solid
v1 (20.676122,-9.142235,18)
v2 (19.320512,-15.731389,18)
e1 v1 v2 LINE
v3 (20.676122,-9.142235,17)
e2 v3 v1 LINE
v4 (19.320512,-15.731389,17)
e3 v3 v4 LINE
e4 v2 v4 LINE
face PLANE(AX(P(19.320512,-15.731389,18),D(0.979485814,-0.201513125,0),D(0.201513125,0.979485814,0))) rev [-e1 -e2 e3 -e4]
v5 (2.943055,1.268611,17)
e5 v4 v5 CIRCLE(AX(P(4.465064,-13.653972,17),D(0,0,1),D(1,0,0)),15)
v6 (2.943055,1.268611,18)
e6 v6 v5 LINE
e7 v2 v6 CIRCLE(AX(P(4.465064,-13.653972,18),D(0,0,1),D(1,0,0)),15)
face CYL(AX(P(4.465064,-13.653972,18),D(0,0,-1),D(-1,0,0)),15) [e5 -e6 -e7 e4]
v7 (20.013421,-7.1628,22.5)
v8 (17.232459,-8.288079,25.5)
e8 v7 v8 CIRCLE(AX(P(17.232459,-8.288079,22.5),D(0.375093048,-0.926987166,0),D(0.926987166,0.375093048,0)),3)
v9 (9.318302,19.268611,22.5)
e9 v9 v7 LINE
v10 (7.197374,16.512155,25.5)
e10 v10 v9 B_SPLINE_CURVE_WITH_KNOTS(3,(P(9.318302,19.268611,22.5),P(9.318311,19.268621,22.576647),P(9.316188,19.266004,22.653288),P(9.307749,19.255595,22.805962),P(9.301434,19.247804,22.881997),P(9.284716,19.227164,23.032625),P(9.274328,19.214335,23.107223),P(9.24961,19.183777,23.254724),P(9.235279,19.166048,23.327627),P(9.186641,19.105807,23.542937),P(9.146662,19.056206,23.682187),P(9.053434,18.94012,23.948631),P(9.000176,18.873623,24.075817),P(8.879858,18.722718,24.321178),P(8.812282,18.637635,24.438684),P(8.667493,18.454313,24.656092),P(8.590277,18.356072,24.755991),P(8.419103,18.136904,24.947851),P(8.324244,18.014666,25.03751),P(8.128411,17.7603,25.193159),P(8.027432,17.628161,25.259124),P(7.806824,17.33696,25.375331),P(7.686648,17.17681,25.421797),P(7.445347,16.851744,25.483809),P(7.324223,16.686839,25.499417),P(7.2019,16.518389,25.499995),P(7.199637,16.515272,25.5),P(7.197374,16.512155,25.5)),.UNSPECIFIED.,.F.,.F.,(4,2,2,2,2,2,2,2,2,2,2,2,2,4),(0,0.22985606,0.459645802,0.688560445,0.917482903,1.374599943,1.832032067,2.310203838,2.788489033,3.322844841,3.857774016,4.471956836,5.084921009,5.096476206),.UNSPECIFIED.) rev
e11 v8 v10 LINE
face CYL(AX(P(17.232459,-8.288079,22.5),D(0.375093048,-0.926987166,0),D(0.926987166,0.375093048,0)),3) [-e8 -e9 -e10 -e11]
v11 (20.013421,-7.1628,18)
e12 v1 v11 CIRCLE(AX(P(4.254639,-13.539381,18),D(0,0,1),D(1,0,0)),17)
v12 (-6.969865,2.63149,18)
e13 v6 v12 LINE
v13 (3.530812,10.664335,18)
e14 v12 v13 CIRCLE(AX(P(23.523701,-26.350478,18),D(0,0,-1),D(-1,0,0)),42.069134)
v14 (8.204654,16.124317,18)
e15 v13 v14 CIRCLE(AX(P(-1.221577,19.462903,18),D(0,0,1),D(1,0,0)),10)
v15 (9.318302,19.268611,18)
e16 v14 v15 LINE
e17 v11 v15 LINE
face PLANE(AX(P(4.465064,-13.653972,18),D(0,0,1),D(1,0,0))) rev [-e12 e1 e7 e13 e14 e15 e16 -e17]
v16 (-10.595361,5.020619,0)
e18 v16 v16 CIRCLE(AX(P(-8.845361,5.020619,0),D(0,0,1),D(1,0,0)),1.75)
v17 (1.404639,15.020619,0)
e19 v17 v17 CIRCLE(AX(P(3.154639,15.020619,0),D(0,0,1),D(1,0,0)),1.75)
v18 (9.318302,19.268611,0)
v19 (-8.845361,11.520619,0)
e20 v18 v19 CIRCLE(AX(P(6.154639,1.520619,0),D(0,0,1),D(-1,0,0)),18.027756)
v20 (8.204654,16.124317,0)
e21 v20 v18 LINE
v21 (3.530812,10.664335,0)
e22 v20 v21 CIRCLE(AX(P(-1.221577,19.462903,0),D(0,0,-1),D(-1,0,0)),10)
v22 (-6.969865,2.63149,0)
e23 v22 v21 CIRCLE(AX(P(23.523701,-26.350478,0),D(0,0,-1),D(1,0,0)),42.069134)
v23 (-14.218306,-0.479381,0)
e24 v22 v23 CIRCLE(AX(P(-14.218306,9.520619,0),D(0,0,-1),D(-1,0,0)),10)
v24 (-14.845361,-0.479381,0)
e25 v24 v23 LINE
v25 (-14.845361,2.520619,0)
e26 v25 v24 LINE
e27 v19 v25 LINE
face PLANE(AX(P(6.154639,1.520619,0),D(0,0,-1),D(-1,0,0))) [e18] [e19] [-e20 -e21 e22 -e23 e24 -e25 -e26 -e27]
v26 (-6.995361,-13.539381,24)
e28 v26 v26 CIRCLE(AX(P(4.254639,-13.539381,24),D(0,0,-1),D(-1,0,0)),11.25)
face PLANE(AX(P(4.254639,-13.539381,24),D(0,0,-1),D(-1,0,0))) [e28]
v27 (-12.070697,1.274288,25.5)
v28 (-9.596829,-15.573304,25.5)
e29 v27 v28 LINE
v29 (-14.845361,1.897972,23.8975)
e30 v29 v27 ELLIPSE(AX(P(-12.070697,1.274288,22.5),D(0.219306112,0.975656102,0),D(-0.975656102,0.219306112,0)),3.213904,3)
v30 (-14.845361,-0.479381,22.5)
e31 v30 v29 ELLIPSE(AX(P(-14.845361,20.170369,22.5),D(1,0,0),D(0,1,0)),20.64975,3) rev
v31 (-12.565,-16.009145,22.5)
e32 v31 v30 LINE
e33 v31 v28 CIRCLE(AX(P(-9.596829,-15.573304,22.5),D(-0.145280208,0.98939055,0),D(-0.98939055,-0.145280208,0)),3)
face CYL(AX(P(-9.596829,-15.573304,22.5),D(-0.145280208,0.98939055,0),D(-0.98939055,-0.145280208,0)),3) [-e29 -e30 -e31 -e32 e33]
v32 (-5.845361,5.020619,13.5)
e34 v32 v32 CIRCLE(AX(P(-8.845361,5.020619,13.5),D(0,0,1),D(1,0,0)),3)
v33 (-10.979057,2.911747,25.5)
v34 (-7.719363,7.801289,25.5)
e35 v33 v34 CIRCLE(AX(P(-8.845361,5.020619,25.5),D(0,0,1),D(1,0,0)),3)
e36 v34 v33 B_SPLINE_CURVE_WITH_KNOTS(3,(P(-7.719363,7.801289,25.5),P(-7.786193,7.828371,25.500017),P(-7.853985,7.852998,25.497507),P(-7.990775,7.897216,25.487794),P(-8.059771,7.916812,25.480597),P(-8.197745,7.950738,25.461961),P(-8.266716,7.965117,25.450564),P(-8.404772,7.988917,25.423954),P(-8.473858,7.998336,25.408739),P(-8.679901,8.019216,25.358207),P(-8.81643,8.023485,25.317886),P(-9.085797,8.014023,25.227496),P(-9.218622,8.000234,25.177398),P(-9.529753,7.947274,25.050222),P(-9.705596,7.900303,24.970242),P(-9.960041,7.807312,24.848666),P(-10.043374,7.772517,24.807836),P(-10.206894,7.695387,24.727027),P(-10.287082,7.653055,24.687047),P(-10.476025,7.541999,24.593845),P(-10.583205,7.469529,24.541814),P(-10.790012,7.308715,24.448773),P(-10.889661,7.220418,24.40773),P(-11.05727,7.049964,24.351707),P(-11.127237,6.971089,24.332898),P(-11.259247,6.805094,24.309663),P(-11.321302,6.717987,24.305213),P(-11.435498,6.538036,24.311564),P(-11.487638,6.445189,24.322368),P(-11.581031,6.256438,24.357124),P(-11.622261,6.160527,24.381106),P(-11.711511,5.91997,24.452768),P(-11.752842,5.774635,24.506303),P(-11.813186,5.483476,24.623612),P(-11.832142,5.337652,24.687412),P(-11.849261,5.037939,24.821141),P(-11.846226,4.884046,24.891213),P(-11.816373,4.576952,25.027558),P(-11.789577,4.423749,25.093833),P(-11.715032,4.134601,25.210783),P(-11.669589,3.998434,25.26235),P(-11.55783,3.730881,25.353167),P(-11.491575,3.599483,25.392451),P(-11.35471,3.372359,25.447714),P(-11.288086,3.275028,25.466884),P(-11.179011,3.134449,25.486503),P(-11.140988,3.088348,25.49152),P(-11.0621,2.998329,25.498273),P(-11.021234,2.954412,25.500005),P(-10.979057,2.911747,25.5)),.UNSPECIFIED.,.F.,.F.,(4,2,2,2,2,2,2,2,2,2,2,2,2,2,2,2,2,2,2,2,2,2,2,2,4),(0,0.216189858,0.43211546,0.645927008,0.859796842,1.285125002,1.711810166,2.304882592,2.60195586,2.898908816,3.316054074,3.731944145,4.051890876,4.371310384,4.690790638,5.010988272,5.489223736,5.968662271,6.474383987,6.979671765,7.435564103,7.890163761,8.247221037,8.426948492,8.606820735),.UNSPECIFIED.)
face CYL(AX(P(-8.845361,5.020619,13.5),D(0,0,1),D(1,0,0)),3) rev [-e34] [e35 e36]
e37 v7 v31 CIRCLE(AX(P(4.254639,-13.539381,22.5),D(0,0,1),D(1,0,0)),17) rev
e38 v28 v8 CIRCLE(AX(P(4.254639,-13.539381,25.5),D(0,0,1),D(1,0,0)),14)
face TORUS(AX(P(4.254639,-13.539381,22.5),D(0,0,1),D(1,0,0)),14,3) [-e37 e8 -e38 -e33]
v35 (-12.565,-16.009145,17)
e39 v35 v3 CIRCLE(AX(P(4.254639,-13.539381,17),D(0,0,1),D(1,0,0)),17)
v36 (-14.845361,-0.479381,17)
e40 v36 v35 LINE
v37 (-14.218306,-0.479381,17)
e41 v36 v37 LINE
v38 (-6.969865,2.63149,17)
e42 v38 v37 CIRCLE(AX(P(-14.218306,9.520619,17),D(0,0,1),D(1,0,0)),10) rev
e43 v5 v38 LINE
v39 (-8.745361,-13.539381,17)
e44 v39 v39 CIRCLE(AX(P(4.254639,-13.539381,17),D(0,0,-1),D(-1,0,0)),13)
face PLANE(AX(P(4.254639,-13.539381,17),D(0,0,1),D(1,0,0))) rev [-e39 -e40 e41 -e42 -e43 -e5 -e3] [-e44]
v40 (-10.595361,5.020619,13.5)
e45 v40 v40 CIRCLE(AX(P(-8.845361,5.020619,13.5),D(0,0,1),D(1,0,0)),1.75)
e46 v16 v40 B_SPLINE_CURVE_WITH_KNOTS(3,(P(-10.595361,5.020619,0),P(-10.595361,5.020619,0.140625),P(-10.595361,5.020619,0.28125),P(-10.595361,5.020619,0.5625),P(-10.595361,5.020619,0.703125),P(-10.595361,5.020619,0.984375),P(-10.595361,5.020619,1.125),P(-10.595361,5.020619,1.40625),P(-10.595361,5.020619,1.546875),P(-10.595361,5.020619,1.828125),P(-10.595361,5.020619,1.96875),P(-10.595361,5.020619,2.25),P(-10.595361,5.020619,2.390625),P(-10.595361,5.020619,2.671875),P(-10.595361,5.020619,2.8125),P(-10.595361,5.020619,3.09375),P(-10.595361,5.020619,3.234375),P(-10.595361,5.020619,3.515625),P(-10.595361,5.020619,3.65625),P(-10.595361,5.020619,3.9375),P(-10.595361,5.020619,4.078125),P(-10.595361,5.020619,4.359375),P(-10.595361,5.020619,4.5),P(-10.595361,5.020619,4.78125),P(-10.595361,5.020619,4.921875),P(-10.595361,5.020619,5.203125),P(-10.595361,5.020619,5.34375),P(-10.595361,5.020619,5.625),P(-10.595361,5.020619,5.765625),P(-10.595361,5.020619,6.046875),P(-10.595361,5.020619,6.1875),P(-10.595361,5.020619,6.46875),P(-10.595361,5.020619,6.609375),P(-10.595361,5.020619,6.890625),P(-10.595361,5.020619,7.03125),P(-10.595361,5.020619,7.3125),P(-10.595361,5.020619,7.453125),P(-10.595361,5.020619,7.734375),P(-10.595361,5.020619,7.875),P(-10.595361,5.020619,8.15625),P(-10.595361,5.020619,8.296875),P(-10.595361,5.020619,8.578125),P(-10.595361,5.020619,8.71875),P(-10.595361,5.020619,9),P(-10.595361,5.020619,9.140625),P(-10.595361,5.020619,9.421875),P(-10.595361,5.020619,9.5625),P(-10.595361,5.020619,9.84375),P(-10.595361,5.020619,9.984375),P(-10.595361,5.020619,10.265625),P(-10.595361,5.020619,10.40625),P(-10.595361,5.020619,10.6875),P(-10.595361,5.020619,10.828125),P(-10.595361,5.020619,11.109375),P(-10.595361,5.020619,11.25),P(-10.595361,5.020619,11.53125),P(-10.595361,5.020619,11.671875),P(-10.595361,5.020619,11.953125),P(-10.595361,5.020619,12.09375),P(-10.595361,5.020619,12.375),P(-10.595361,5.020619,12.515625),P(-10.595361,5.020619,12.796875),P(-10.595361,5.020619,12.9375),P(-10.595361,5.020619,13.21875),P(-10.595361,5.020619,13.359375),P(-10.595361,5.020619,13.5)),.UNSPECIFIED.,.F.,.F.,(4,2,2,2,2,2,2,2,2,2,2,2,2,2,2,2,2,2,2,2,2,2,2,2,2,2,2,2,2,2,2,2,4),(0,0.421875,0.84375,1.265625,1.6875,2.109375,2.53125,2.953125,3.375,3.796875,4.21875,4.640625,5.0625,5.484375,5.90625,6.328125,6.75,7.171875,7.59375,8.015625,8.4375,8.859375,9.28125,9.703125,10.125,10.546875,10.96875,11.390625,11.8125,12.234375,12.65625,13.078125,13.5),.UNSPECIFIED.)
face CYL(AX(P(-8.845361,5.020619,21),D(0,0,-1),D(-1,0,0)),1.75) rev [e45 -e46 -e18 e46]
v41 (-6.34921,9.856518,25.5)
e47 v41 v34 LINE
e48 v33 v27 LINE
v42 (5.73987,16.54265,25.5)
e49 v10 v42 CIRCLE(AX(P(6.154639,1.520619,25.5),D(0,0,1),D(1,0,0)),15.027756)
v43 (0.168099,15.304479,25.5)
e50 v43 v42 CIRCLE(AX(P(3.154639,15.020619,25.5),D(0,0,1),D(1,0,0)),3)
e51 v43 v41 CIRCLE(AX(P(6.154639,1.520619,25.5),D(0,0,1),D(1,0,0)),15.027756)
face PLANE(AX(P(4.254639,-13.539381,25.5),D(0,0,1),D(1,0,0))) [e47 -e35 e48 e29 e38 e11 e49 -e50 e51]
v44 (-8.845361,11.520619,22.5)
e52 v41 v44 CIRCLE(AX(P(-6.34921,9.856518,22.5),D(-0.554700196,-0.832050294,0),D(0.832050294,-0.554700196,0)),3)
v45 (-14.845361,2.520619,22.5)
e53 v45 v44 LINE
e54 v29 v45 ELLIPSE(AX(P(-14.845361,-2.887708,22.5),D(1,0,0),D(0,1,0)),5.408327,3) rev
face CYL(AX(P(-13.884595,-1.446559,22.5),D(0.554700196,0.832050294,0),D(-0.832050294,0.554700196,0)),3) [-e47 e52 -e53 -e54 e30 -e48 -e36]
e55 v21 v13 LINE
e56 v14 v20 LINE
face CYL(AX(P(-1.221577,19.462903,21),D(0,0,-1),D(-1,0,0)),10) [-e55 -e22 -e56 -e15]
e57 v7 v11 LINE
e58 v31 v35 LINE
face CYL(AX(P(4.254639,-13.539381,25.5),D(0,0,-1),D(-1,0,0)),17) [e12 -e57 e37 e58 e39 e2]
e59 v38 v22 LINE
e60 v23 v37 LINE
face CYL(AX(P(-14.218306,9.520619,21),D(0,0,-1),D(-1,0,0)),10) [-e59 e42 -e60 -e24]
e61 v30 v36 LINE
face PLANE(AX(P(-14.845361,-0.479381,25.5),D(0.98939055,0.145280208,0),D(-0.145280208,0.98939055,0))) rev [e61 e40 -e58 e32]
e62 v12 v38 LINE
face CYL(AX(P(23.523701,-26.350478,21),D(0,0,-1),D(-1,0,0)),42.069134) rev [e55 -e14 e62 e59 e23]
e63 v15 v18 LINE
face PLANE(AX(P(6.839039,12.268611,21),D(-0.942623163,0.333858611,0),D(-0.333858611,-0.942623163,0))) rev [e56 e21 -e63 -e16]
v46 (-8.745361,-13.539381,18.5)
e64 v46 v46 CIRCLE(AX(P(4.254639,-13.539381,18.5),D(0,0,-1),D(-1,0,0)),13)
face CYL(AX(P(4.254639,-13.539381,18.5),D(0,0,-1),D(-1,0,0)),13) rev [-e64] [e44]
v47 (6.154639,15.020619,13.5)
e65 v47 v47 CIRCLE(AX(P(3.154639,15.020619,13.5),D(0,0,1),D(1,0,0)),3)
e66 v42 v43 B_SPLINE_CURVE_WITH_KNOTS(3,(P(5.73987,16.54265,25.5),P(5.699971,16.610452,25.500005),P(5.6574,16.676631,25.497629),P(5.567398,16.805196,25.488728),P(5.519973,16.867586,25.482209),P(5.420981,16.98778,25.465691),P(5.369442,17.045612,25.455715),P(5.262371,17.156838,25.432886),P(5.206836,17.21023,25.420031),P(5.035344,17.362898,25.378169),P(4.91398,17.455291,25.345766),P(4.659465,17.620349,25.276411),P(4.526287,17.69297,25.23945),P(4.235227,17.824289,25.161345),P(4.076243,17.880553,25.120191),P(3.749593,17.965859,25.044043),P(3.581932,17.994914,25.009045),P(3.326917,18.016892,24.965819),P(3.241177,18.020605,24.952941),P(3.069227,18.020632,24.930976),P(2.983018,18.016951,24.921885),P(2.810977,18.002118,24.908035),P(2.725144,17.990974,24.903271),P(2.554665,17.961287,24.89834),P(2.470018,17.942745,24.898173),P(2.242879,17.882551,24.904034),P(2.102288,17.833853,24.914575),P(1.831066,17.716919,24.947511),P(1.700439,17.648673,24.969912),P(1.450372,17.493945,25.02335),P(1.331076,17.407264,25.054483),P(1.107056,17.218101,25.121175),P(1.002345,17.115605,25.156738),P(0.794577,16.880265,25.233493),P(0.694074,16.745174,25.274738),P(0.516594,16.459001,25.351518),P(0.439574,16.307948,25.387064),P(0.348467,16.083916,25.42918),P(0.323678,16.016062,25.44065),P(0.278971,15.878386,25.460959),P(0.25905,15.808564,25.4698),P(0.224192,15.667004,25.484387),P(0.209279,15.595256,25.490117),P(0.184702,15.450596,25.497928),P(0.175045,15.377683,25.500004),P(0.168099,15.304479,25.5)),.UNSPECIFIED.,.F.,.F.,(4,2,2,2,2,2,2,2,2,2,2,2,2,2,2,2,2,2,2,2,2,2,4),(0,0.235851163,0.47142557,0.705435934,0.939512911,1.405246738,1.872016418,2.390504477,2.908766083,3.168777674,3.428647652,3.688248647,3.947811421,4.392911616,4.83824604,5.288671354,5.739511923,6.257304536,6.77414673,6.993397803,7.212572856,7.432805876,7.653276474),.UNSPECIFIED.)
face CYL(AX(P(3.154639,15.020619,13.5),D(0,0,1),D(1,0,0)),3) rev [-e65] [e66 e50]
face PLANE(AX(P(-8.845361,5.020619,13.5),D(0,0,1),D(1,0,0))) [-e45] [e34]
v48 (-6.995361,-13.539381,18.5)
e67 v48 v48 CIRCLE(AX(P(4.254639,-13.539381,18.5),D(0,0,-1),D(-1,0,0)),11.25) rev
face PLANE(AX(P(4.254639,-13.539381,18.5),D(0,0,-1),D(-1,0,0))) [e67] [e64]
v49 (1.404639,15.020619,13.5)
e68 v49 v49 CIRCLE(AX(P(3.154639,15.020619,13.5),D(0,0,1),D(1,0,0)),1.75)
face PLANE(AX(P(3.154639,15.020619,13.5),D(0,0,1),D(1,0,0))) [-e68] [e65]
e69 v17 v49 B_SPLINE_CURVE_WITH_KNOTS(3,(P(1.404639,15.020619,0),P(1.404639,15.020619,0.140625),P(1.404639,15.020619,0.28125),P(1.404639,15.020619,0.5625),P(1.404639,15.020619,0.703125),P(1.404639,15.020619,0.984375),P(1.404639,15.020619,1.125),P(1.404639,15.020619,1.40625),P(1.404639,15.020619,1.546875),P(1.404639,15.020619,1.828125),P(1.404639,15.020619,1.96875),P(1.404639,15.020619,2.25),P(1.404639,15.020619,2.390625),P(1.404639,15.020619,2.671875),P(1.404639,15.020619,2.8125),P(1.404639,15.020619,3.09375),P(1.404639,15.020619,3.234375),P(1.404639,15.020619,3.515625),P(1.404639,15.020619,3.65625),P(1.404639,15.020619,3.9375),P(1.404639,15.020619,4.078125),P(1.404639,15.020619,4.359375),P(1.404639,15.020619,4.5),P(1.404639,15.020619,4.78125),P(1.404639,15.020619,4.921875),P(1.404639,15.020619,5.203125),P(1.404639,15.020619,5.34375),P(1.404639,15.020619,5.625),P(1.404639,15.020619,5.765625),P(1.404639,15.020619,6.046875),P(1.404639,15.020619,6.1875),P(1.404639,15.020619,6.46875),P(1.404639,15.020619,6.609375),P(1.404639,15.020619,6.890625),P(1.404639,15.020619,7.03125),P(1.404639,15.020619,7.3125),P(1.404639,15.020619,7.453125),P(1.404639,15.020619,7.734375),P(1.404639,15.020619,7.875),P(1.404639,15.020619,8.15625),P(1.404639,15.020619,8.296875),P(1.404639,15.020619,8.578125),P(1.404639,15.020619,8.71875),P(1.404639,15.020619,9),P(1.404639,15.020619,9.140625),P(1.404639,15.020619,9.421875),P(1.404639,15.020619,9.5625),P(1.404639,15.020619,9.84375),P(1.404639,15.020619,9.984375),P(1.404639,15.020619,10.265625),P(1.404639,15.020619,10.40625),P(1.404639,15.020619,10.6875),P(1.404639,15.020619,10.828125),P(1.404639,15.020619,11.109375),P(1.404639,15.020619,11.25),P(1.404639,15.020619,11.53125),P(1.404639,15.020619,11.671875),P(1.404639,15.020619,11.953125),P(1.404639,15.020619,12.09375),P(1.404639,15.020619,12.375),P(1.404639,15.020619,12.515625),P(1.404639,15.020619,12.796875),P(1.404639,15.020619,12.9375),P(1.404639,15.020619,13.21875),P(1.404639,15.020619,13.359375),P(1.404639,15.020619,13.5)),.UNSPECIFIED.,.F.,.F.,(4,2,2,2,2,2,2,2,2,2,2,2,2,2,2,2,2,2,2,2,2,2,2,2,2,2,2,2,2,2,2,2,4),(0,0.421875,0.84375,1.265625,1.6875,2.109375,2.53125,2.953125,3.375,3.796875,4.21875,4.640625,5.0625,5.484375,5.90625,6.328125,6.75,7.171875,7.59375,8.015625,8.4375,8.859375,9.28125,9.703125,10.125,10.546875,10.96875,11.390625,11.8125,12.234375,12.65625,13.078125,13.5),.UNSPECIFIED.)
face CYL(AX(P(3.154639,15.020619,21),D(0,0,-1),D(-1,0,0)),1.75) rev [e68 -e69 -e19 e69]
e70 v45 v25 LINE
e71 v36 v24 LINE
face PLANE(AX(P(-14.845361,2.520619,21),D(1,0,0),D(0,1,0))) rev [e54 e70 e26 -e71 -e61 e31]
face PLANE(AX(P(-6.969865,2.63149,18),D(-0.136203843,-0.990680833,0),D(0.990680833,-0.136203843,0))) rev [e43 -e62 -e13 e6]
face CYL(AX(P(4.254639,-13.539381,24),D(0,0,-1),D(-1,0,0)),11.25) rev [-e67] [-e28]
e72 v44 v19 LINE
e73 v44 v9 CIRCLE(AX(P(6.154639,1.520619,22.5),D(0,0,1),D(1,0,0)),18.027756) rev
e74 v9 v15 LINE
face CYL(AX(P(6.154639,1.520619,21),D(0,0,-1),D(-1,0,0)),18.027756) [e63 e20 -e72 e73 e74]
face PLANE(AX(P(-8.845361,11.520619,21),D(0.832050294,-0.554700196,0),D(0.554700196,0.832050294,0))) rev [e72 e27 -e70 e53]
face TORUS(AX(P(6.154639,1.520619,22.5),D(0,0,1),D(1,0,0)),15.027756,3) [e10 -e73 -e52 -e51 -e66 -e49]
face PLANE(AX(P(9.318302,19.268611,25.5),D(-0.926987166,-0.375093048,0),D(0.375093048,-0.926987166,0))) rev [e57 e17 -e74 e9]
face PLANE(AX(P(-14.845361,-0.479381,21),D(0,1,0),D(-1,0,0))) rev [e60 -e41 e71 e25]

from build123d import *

# Parameters (mm, degrees)
SKETCH1_R                = 1.75
BOSS_EXTRUDE1_DEPTH      = 21
FILLET3_R                = 10
BOSS_EXTRUDE2_DEPTH      = 4.5
BOSS_EXTRUDE2_DEPTH_BACK = 4
SKETCH3_R                = 1.75
SKETCH4_R                = 11.25
CUT_EXTRUDE1_DEPTH       = 7
SKETCH5_R                = 13
CUT_EXTRUDE2_DEPTH       = 1.5
SKETCH6_R                = 3
CUT_EXTRUDE3_DEPTH       = 12
CUT_EXTRUDE4_DEPTH       = 1
FILLET7_R                = 3
FILLET8_R                = 10


with BuildPart() as part:
    # Sketch1 → Boss-Extrude1 (new body)
    with BuildSketch(Plane.XY):
        with BuildLine():
            Line((-8.845360825, 11.520618557), (-14.845360825, 2.520618557))
            Line((-14.845360825, 2.520618557), (-14.845360825, -0.479381443))
            Line((-14.845360825, -0.479381443), (-9.845360825, -0.479381443))
            Line((-9.845360825, -0.479381443), (-8.845360825, 0.520618557))
            ThreePointArc((-8.845360825, 0.520618557), (-1.696742799, 7.320595709), (6.83903909, 12.26861112))
            Line((6.83903909, 12.26861112), (9.318301605, 19.26861112))
            ThreePointArc((9.318301605, 19.26861112), (-0.918731235, 18.102760488), (-8.845360825, 11.520618557))
        make_face()
        with Locations(Location((-8.845360825, 5.020618557, 0), (0, 0, 180))):
            Circle(SKETCH1_R, mode=Mode.SUBTRACT)
        with Locations(Location((3.154639175, 15.020618557, 0), (0, 0, 180))):
            Circle(SKETCH1_R, mode=Mode.SUBTRACT)
    extrude(amount=BOSS_EXTRUDE1_DEPTH)

    # Fillet3
    # the kernel refuses this fillet: 10 mm, written as the material it takes off along each edge
    with BuildSketch(Plane(origin=(-9.845360825, -0.479381443, -10.932362995), x_dir=(-1, 0, 0), z_dir=(0, 0, 1))) as fillet3_piece_1:
        with BuildLine():
            CenterArc((4.372945198, -10), FILLET3_R, 90, 46.455884642)
            Line((-2.87549632, -3.110871204), (-3.600340471, -2.421958325))
            ThreePointArc((-3.600340471, -2.421958325), (-1.769425443, -0.361263367), (-0.707106781, 0.707106781))
            Line((-0.707106781, 0.707106781), (0, 1))
            Line((0, 1), (4.372945198, 1))
            Line((4.372945198, 1), (4.372945198, 0))
        make_face()
    extrude(amount=42.86472599, mode=Mode.SUBTRACT)

    # Sketch3 → Boss-Extrude2 (add, two sides: drawn at the far end of the back side and taken through both)
    with BuildSketch(Plane.XY.offset(21).offset(-BOSS_EXTRUDE2_DEPTH_BACK)):
        with BuildLine():
            Line((-14.845360825, 2.520618557), (-14.845360825, -0.479381443))
            Line((-14.845360825, -0.479381443), (-12.565000182, -16.009144975))
            ThreePointArc((-12.565000182, -16.009144975), (8.709502938, -29.945300767), (20.013420995, -7.162799635))
            Line((20.013420995, -7.162799635), (9.318301605, 19.26861112))
            ThreePointArc((9.318301605, 19.26861112), (-0.918731235, 18.102760488), (-8.845360825, 11.520618557))
            Line((-8.845360825, 11.520618557), (-14.845360825, 2.520618557))
        make_face()
        with Locations(Location((3.154639175, 15.020618557, 0), (0, 0, 180))):
            Circle(SKETCH3_R, mode=Mode.SUBTRACT)
        with Locations(Location((-8.845360825, 5.020618557, 0), (0, 0, 180))):
            Circle(SKETCH3_R, mode=Mode.SUBTRACT)
    extrude(amount=BOSS_EXTRUDE2_DEPTH + BOSS_EXTRUDE2_DEPTH_BACK)

    # Sketch4 → Cut-Extrude1 (cut)
    with BuildSketch(Plane(origin=(0, 0, 17), x_dir=(-1, 0, 0), z_dir=(0, 0, -1))):
        with Locations((-4.254639175, -13.539381443)):
            Circle(SKETCH4_R)
    extrude(amount=-CUT_EXTRUDE1_DEPTH, mode=Mode.SUBTRACT)

    # Sketch5 → Cut-Extrude2 (cut)
    with BuildSketch(Plane(origin=(0, 0, 17), x_dir=(-1, 0, 0), z_dir=(0, 0, -1))):
        with Locations((-4.254639175, -13.539381443)):
            Circle(SKETCH5_R)
    extrude(amount=-CUT_EXTRUDE2_DEPTH, mode=Mode.SUBTRACT)

    # Sketch6 → Cut-Extrude3 (cut)
    with BuildSketch(Plane.XY.offset(25.5)):
        with Locations((-8.845360825, 5.020618557)):
            Circle(SKETCH6_R)
        with Locations((3.154639175, 15.020618557)):
            Circle(SKETCH6_R)
    extrude(amount=-CUT_EXTRUDE3_DEPTH, mode=Mode.SUBTRACT)

    # Sketch7 → Cut-Extrude4 (cut)
    with BuildSketch(Plane(origin=(0, 0, 17), x_dir=(-1, 0, 0), z_dir=(0, 0, -1))):
        with BuildLine():
            Line((-19.320512006, -15.73138888), (-26.521187379, 19.26861112))
            Line((-26.521187379, 19.26861112), (-9.318301605, 19.26861112))
            Line((-9.318301605, 19.26861112), (-6.83903909, 12.26861112))
            ThreePointArc((-6.83903909, 12.26861112), (0.552528201, 8.148031782), (6.969864505, 2.631489761))
            Line((6.969864505, 2.631489761), (-2.943055137, 1.26861112))
            ThreePointArc((-2.943055137, 1.26861112), (-15.267616881, -3.247010549), (-19.320512006, -15.73138888))
        make_face()
    extrude(amount=-CUT_EXTRUDE4_DEPTH, mode=Mode.SUBTRACT)

    # Fillet7
    # the kernel refuses this fillet: 3 mm, written as the material it takes off along each edge
    with BuildSketch(Plane(origin=(-8.845360825, 11.520618557, 25.5), x_dir=(0, 0, -1), z_dir=(-0.554700196225229, -0.8320502943378438, 0))) as fillet7_piece_1:
        with BuildLine():
            CenterArc((FILLET7_R, FILLET7_R), FILLET7_R, 180, 90)
            Line((0, FILLET7_R), (0, 0))
            Line((0, 0), (FILLET7_R, 0))
        make_face()
    extrude(amount=18.316653826, mode=Mode.SUBTRACT)
    with BuildSketch(Plane(origin=(-18.114165499, 21.781905941, 25.5), x_dir=(0, 0, -1), z_dir=(0.14528020772302286, -0.9893905504116943, 0))) as fillet7_piece_2:
        with BuildLine():
            CenterArc((FILLET7_R, FILLET7_R), FILLET7_R, 180, 90)
            Line((0, FILLET7_R), (0, 0))
            Line((0, 0), (FILLET7_R, 0))
        make_face()
    extrude(amount=38.196292556, mode=Mode.SUBTRACT)
    with BuildSketch(Plane(origin=(4.254639175, -13.539381443, 25.5), x_dir=(-0.9893905504116943, -0.14528020772302197, 0), z_dir=(-0.14528020772302197, 0.9893905504116943, 0))) as fillet7_piece_3:
        with BuildLine():
            CenterArc((17 - FILLET7_R, -FILLET7_R), FILLET7_R, 0, 90)
            Line((17 - FILLET7_R, 0), (17, 0))
            Line((17, 0), (17, -FILLET7_R))
        make_face()
    revolve(axis=Axis((4.254639175, -13.539381443, 25.5), (0, 0, 1)), revolution_arc=193.67655813, mode=Mode.SUBTRACT)
    with BuildSketch(Plane(origin=(6.154639175, 1.520618557, 25.5), x_dir=(0.5584515746383966, 0.8295371232102247, 0), z_dir=(0.8295371232102247, -0.5584515746383966, 0))) as fillet7_piece_4:
        with BuildLine():
            CenterArc((18.027756377 - FILLET7_R, -FILLET7_R), FILLET7_R, 0, 90)
            Line((18.027756377 - FILLET7_R, 0), (18.027756377, 0))
            Line((18.027756377, 0), (18.027756377, -FILLET7_R))
        make_face()
    revolve(axis=Axis((6.154639175, 1.520618557, 25.5), (0, 0, 1)), revolution_arc=90.258713785, mode=Mode.SUBTRACT)
    with BuildSketch(Plane(origin=(20.013420995, -7.162799635, 25.5), x_dir=(-0.9269871658598542, -0.3750930475643543, 0), z_dir=(-0.37509304756435435, 0.9269871658598543, 0))) as fillet7_piece_5:
        with BuildLine():
            CenterArc((FILLET7_R, -FILLET7_R), FILLET7_R, 90, 90)
            Line((0, -FILLET7_R), (0, 0))
            Line((0, 0), (FILLET7_R, 0))
        make_face()
    extrude(amount=36.013243471, mode=Mode.SUBTRACT)

    # Fillet8
    fillet8_edges = [part.edges().sort_by_distance(p)[0] for p in [
        (6.83903909, 12.26861112, 9),
    ]]
    fillet(fillet8_edges, radius=FILLET8_R)


solid = part.part
